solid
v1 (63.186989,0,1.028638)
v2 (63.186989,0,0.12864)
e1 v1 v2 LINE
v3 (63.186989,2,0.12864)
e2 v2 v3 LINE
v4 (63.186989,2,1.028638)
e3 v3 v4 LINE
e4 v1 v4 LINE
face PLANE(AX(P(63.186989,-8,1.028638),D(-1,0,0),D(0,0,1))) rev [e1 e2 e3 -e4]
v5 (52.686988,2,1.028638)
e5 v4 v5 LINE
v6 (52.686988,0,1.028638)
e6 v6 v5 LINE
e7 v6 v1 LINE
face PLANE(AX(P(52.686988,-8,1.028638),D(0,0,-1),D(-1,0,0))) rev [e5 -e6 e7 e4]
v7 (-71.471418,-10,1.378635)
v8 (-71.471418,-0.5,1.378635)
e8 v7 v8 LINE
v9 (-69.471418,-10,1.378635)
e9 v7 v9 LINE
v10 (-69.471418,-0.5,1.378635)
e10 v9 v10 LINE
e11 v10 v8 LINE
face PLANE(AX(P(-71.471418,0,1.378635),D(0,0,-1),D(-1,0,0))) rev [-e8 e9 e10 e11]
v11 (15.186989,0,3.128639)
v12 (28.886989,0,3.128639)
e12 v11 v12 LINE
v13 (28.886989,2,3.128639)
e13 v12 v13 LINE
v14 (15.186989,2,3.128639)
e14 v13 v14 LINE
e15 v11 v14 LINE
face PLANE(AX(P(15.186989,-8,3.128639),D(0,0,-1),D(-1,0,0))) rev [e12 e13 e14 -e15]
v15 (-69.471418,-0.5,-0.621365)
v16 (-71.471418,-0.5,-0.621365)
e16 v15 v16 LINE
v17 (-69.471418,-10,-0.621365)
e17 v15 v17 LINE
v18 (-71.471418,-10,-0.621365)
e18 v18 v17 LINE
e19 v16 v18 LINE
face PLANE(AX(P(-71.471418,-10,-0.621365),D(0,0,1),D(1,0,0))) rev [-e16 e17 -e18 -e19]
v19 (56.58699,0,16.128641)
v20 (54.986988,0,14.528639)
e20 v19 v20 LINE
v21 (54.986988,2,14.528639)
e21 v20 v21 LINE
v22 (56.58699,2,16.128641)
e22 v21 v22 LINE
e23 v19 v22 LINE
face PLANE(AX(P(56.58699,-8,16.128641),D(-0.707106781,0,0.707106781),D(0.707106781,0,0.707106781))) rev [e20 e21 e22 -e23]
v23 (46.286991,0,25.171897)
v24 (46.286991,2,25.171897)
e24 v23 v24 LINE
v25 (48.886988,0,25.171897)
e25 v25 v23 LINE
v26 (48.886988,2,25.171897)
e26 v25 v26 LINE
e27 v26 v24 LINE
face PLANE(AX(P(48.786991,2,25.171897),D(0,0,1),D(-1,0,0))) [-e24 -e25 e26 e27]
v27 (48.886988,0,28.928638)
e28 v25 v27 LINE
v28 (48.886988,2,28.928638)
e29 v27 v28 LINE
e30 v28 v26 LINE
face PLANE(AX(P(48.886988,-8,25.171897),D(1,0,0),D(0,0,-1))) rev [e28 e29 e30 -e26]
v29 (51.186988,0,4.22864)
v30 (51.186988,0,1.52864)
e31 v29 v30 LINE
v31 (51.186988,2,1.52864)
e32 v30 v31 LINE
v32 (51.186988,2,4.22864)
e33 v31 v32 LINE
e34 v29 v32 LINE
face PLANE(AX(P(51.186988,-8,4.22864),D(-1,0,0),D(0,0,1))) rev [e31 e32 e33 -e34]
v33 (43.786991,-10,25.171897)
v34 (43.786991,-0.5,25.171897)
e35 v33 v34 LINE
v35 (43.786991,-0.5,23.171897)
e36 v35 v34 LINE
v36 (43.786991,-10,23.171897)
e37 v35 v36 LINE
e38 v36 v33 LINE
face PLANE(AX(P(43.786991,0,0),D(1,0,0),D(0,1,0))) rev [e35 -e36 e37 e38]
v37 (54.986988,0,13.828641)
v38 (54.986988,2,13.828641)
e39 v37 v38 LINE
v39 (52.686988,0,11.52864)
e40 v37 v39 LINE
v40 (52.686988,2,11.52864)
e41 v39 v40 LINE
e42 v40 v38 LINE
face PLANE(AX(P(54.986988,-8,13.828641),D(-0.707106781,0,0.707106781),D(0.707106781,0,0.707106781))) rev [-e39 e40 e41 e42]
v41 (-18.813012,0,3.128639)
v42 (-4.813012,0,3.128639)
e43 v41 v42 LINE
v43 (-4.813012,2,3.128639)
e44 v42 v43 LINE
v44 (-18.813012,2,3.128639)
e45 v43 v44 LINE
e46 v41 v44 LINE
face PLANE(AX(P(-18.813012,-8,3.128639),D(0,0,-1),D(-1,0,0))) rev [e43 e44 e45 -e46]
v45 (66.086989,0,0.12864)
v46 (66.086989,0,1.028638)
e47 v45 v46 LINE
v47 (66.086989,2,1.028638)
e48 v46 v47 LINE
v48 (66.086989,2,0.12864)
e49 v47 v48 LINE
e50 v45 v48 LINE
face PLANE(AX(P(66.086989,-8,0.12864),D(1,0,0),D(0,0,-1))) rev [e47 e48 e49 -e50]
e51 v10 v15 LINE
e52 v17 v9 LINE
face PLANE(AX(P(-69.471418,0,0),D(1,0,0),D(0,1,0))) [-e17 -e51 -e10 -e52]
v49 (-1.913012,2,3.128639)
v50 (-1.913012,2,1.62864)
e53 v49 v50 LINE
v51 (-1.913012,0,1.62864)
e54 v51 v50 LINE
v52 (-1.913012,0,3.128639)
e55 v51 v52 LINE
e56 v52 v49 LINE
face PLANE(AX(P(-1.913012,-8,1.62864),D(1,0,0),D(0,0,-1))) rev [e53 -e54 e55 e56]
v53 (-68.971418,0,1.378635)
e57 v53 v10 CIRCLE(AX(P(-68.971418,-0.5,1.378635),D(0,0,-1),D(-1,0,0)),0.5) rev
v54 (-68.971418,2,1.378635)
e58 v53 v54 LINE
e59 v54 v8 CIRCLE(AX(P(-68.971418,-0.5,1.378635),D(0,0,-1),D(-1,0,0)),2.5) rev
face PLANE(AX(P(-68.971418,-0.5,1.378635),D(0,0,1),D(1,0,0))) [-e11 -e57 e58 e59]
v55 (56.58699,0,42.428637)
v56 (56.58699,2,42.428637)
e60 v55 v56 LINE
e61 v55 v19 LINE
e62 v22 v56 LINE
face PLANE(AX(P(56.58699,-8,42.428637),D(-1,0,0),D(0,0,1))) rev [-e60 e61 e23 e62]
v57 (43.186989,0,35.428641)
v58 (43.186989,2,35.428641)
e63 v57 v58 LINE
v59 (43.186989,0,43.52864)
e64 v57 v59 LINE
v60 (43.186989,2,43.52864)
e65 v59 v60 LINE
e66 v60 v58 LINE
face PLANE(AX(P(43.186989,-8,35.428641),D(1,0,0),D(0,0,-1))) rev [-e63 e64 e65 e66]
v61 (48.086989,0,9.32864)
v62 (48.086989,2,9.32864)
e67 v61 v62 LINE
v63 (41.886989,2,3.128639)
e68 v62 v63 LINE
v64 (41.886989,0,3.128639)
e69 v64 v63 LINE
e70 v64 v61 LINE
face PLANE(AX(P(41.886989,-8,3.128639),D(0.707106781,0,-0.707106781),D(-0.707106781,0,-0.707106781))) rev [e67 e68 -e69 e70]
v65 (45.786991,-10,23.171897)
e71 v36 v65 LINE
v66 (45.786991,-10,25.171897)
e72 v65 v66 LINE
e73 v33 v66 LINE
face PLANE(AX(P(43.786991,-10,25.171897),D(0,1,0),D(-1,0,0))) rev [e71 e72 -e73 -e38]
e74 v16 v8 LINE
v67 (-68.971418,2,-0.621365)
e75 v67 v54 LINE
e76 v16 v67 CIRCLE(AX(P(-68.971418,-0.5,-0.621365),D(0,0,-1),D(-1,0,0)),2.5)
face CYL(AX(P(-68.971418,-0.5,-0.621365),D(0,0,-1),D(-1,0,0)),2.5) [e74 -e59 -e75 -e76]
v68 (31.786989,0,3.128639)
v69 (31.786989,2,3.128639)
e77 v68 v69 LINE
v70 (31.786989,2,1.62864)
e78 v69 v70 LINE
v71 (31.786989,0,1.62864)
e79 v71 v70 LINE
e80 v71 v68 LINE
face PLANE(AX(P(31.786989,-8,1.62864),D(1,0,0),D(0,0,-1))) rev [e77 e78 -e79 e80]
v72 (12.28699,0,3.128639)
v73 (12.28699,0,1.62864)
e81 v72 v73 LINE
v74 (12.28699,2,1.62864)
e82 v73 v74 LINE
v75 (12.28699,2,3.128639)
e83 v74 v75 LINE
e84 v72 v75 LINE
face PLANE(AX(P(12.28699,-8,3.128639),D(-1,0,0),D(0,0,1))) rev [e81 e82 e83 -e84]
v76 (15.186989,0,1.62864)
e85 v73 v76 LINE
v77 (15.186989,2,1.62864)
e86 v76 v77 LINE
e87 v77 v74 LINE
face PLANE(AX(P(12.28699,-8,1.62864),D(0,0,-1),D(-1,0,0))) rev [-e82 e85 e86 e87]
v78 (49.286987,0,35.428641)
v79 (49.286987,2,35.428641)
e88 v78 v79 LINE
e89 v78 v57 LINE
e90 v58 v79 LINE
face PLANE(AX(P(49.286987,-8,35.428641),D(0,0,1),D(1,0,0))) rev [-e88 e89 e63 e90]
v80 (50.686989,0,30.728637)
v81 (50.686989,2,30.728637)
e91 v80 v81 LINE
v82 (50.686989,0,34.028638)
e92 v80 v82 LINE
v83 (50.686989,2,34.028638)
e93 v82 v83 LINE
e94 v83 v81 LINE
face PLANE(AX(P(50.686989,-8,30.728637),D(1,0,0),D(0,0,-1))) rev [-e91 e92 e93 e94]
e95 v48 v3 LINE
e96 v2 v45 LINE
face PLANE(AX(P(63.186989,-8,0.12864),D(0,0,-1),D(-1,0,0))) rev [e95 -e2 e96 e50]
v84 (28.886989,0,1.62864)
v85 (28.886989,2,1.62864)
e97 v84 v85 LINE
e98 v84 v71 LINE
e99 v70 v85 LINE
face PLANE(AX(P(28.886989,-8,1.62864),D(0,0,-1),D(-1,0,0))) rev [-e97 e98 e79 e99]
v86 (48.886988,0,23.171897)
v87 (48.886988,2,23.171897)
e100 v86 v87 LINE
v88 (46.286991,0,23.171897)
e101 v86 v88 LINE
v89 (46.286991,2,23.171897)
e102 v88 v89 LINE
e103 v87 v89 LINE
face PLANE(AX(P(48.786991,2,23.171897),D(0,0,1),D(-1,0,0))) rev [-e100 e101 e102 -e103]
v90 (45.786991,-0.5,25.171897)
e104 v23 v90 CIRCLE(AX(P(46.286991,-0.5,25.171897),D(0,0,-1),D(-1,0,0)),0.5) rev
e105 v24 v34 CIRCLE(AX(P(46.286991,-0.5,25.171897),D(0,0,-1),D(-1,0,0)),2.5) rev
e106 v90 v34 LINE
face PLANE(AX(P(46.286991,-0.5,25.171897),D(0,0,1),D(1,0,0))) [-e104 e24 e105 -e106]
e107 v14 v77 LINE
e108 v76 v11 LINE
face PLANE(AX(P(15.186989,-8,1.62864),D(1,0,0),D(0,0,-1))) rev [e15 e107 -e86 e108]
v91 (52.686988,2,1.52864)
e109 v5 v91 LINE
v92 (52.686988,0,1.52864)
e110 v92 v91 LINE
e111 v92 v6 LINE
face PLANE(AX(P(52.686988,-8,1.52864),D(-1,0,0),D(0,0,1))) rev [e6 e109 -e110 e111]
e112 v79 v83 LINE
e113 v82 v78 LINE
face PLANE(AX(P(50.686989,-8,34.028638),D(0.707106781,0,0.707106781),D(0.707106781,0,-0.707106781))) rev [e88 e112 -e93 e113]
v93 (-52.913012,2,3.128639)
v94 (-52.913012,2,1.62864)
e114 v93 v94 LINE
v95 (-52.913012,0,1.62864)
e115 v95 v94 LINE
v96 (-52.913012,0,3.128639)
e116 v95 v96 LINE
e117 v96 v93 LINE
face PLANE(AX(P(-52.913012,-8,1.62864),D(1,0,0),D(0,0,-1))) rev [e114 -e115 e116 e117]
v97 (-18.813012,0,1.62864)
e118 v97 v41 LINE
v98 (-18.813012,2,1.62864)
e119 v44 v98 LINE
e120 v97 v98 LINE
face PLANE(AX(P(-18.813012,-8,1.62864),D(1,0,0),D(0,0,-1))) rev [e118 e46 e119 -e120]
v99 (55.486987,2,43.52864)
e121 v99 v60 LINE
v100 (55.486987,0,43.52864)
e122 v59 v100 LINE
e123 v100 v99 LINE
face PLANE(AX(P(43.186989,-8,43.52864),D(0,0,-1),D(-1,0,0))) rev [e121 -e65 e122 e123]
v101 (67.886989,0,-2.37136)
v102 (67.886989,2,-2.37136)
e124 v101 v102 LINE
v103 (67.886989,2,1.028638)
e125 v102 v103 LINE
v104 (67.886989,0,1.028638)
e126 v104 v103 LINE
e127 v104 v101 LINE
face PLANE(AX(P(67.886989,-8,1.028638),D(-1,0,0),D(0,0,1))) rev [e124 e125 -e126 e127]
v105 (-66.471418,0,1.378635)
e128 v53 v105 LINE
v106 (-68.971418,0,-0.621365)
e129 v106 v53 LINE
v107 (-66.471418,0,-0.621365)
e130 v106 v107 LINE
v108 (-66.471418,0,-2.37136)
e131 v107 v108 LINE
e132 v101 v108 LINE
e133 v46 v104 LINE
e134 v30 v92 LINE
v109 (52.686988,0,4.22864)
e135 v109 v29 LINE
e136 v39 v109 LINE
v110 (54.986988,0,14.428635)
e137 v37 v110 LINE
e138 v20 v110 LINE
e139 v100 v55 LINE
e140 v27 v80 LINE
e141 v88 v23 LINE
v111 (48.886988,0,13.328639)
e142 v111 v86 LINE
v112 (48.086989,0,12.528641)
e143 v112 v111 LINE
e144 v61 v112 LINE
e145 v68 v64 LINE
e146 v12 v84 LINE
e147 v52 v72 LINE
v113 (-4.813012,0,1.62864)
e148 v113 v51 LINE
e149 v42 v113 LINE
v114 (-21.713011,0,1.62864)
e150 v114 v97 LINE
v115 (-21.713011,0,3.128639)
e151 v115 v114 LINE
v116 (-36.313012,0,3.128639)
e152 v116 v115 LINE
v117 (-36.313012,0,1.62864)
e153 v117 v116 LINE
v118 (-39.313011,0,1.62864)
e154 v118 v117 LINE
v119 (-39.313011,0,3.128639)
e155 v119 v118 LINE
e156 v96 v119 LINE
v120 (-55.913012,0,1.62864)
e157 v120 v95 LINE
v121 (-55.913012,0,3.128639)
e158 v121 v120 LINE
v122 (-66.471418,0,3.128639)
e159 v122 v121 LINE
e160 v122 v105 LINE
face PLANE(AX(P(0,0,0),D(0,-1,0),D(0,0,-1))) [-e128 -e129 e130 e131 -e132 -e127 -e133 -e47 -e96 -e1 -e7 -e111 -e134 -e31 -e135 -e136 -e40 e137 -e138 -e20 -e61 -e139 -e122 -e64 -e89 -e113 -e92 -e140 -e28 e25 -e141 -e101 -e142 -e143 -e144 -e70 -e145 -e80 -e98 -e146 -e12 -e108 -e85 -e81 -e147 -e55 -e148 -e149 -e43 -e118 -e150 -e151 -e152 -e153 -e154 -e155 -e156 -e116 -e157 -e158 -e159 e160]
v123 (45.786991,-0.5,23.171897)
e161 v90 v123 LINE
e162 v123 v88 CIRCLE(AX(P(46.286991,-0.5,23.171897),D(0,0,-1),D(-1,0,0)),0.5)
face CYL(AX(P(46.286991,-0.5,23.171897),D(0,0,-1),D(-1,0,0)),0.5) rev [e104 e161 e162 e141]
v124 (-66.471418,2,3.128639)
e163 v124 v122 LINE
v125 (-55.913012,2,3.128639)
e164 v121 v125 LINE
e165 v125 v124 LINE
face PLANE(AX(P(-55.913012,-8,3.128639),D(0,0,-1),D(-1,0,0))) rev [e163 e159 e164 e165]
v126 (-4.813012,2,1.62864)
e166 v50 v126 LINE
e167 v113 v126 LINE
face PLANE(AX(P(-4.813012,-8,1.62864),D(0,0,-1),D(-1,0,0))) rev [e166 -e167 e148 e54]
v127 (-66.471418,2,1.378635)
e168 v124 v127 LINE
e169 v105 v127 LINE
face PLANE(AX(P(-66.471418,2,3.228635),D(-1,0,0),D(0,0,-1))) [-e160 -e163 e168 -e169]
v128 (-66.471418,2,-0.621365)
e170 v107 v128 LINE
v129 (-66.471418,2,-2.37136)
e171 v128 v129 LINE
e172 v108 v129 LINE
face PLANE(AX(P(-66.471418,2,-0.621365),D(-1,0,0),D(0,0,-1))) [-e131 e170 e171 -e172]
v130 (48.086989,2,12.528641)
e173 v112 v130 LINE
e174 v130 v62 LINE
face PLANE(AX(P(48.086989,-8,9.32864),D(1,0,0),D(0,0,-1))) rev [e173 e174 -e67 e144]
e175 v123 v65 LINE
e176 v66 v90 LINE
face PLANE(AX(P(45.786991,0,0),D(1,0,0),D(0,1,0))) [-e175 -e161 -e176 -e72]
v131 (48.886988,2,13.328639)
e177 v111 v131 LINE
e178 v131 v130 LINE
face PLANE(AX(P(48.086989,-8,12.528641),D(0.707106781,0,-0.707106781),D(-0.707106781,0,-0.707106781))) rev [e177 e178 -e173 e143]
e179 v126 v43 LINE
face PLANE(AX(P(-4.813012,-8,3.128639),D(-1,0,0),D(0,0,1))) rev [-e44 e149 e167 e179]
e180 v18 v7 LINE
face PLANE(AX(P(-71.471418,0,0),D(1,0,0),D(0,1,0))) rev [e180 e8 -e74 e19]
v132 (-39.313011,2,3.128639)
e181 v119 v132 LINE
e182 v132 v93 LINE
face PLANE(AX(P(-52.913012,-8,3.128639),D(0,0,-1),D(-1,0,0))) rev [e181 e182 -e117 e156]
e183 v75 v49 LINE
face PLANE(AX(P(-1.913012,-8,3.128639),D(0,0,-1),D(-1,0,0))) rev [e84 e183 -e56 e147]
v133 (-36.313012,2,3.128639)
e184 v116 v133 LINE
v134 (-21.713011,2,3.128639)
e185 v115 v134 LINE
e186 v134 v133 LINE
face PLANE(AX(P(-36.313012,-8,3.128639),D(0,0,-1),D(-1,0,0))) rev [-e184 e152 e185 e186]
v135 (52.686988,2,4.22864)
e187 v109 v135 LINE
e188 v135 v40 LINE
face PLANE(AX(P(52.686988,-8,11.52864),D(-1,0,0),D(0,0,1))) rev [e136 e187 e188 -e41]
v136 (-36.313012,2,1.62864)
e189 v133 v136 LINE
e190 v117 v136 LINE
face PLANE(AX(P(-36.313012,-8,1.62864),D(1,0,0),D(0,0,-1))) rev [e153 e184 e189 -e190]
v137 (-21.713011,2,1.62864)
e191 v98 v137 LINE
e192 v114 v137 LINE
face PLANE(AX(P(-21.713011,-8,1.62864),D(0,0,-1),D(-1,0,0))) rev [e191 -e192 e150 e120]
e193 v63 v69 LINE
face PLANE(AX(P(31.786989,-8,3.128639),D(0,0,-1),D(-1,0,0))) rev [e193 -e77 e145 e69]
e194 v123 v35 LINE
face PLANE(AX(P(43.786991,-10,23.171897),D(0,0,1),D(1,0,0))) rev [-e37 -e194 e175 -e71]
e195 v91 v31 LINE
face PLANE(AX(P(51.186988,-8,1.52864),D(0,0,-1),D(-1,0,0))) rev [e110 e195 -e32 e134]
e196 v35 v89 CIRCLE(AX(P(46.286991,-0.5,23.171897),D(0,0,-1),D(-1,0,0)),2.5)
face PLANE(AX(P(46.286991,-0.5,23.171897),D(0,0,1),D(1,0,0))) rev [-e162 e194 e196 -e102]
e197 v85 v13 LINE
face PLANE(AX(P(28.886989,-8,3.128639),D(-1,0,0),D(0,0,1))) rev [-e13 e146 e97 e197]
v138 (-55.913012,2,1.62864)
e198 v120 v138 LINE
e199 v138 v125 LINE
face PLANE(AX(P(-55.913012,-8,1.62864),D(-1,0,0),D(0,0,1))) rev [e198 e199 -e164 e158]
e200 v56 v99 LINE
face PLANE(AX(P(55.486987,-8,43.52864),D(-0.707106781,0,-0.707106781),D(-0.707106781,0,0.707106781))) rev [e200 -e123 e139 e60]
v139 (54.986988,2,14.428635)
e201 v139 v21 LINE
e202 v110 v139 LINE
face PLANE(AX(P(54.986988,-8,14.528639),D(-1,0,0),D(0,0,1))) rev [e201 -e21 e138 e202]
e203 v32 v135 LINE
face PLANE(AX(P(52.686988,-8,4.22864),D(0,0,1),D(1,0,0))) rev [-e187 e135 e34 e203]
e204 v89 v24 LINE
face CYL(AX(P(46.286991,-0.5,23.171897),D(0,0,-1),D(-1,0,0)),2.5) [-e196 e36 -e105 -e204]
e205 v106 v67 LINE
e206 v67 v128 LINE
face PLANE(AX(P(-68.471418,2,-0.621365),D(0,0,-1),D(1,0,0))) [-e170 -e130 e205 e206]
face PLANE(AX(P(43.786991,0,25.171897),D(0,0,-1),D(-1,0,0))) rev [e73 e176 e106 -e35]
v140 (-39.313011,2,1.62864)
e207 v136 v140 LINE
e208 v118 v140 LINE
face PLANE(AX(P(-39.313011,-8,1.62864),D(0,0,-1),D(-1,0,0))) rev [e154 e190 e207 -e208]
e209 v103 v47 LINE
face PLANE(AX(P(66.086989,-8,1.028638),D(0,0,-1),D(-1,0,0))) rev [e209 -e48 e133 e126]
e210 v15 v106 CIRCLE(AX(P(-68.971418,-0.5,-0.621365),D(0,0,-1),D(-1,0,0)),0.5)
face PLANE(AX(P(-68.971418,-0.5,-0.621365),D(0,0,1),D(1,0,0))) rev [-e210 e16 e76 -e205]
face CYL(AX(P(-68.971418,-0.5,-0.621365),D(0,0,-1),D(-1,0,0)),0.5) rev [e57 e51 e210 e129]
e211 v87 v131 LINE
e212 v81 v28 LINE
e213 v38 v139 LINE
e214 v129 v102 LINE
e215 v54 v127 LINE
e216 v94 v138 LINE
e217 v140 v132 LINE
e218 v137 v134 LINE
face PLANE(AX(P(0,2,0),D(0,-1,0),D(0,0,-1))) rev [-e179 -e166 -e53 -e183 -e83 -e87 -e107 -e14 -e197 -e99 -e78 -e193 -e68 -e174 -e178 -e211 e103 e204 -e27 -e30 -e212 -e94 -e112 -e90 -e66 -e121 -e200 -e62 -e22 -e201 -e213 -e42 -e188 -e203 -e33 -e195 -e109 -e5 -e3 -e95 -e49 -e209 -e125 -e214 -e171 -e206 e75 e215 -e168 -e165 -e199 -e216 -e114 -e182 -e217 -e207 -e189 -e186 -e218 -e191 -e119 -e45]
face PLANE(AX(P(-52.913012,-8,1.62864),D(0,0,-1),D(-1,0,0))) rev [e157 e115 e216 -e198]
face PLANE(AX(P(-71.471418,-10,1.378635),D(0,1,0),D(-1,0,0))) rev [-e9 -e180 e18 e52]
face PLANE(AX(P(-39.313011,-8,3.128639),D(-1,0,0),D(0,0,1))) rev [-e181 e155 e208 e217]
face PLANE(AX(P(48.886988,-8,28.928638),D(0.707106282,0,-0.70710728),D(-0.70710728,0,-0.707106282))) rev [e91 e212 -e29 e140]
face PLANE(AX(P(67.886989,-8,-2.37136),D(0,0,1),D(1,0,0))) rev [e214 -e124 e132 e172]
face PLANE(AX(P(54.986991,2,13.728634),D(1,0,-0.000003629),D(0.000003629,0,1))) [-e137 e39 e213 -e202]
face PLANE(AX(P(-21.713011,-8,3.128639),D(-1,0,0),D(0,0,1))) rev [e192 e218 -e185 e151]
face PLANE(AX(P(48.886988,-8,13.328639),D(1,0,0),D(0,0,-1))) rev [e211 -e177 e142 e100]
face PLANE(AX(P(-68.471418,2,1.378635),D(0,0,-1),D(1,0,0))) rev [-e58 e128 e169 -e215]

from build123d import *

# Parameters (mm, degrees)
BOSS_EXTRUDE1_DEPTH     = 2
EDGE_FLANGE1_DEPTH      = 2
EDGE_FLANGE1_BEND_DEPTH = 2
MOVE_FACE1_BY           = 5
CUT_EXTRUDE1_DEPTH      = 10


# Sheet-metal steps are written as plain solids
with BuildPart() as part:
    # Sketch1 → Boss-Extrude1 (new body)
    with BuildSketch(Plane(origin=(0, 0, 0), x_dir=(1, 0, 0), z_dir=(0, 1, 0))):
        Polygon((48.786990623, -23.171897133), (48.786990623, -13.328634875), (47.986992223, -12.528636475), (47.986992223, -9.428635055), (41.786991923, -3.228634755), (-54.913007717, -3.228634755), (-66.471417942, -3.228634755), (-66.471417942, -1.378635375), (-68.471417942, -1.378635375), (-68.471417942, 0.621364625), (-66.471417942, 0.621364625), (-66.471417942, 2.471364005), (-54.913007717, 2.471364005), (65.786992183, 2.471364005), (65.786992183, -1.128636415), (52.786992783, -1.128636415), (52.786992783, -11.528635935), (54.986990923, -13.728634075), (54.986993463, -14.428635215), (56.686992603, -16.128634355), (56.686992603, -42.528634895), (53.786993323, -45.428634175), (43.086991863, -45.428634175), (43.086991863, -34.028634115), (49.286992163, -34.028634115), (50.586992103, -32.728634175), (50.586992103, -30.828635435), (48.786990623, -29.028636495), (48.786990623, -25.171897133), (46.786990623, -25.171897133), (46.786990623, -23.171897133), align=None)
    extrude(amount=BOSS_EXTRUDE1_DEPTH)

    # Edge-Flange1 section (across the edge) → Edge-Flange1 (add)
    with BuildSketch(Plane(origin=(-69.471417942, 0, 1.378635375), x_dir=(1, 0, 0), z_dir=(0, 0, -1))):
        with BuildLine():
            Line((-2, 0.5), (-2, 10))
            Line((-2, 10), (0, 10))
            Line((0, 10), (0, 0.5))
            ThreePointArc((0, 0.5), (0.146446609, 0.146446609), (0.5, 0))
            Line((0.5, 0), (1, 0))
            Line((1, 0), (1, -2))
            Line((1, -2), (0.5, -2))
            ThreePointArc((0.5, -2), (-1.267766953, -1.267766953), (-2, 0.5))
        make_face()
    extrude(amount=EDGE_FLANGE1_DEPTH)

    # Edge-Flange1 section 2 (across the edge) → Edge-Flange1 bend (add)
    with BuildSketch(Plane(origin=(45.786990623, 0, 25.171897133), x_dir=(1, 0, 0), z_dir=(0, 0, -1))):
        with BuildLine():
            Line((-2, 0.5), (-2, 10))
            Line((-2, 10), (0, 10))
            Line((0, 10), (0, 0.5))
            ThreePointArc((0, 0.5), (0.146446609, 0.146446609), (0.5, 0))
            Line((0.5, 0), (1, 0))
            Line((1, 0), (1, -2))
            Line((1, -2), (0.5, -2))
            ThreePointArc((0.5, -2), (-1.267766953, -1.267766953), (-2, 0.5))
        make_face()
    extrude(amount=EDGE_FLANGE1_BEND_DEPTH)

    # Move Face1: a face moved outward by 5.0
    extrude(part.faces().sort_by_distance((65.786992183, 1, -0.671363795))[0], amount=MOVE_FACE1_BY, dir=(1, 0, 0))

    # Sketch12 → Cut-Extrude1 (cut)
    with BuildSketch(Plane(origin=(0, 2, 0), x_dir=(1, 0, 0), z_dir=(0, 1, 0))):
        Polygon((-52.913012042, -1.628639718), (-55.913012042, -1.628639718), (-55.913012042, -3.128639258), (-67.564249917, -3.128639258), (-67.671952829, -4.327104706), (41.886988858, -5.326407077), (48.086989158, -13.828640718), (48.007739716, -22.517187069), (46.286990623, -23.171897133), (48.886987558, -23.171897133), (48.886987558, -13.328639178), (48.086989158, -12.528640778), (48.086989158, -9.328639558), (41.886988858, -3.128639258), (31.786988738, -3.128639258), (31.786988738, -1.628639718), (28.886989458, -1.628639718), (28.886989458, -3.128639258), (15.186988918, -3.128639258), (15.186988918, -1.628639718), (12.286989638, -1.628639718), (12.286989638, -3.128639258), (-1.913012442, -3.128639258), (-1.913012442, -1.628639718), (-4.813011722, -1.628639718), (-4.813011722, -3.128639258), (-18.813011662, -3.128639258), (-18.813011662, -1.628639718), (-21.713010942, -1.628639718), (-21.713010942, -3.128639258), (-36.313012222, -3.128639258), (-36.313012222, -1.628639718), (-39.313011302, -1.628639718), (-39.313011302, -3.128639258), (-52.913012042, -3.128639258), align=None)
        Polygon((48.886987558, -25.171897133), (46.286990623, -25.171897133), (41.570815933, -34.028638418), (41.570815933, -47.167587605), (56.254650903, -46.954291818), (57.278434149, -42.02008581), (58.126913923, -16.761088184), (54.30540669, -8.580570975), (54.30540669, -2.3223377), (71.613193797, -2.589733287), (71.946410025, 3.760976012), (44.354427072, 3.760976012), (-68.474759816, 3.760976012), (-68.386329283, 2.371359902), (67.886988718, 2.371359902), (67.886988718, -1.028638378), (66.086988718, -1.028638378), (66.086988718, -0.128640178), (63.186989438, -0.128640178), (63.186989438, -1.028638378), (52.686987578, -1.028638378), (52.686987578, -1.528639918), (51.186988038, -1.528639918), (51.186988038, -4.228639598), (52.686987578, -4.228639598), (52.686987578, -11.528640238), (54.986988058, -13.828640718), (54.986988058, -14.528639318), (56.586989938, -16.128641198), (56.586989938, -42.428636858), (55.486987058, -43.528639738), (43.186988798, -43.528639738), (43.186988798, -35.428640698), (49.286986758, -35.428640698), (50.686989038, -34.028638418), (50.686989038, -30.728637398), (48.886987558, -28.928638458), align=None)
    extrude(amount=-CUT_EXTRUDE1_DEPTH, mode=Mode.SUBTRACT)


solid = part.part
